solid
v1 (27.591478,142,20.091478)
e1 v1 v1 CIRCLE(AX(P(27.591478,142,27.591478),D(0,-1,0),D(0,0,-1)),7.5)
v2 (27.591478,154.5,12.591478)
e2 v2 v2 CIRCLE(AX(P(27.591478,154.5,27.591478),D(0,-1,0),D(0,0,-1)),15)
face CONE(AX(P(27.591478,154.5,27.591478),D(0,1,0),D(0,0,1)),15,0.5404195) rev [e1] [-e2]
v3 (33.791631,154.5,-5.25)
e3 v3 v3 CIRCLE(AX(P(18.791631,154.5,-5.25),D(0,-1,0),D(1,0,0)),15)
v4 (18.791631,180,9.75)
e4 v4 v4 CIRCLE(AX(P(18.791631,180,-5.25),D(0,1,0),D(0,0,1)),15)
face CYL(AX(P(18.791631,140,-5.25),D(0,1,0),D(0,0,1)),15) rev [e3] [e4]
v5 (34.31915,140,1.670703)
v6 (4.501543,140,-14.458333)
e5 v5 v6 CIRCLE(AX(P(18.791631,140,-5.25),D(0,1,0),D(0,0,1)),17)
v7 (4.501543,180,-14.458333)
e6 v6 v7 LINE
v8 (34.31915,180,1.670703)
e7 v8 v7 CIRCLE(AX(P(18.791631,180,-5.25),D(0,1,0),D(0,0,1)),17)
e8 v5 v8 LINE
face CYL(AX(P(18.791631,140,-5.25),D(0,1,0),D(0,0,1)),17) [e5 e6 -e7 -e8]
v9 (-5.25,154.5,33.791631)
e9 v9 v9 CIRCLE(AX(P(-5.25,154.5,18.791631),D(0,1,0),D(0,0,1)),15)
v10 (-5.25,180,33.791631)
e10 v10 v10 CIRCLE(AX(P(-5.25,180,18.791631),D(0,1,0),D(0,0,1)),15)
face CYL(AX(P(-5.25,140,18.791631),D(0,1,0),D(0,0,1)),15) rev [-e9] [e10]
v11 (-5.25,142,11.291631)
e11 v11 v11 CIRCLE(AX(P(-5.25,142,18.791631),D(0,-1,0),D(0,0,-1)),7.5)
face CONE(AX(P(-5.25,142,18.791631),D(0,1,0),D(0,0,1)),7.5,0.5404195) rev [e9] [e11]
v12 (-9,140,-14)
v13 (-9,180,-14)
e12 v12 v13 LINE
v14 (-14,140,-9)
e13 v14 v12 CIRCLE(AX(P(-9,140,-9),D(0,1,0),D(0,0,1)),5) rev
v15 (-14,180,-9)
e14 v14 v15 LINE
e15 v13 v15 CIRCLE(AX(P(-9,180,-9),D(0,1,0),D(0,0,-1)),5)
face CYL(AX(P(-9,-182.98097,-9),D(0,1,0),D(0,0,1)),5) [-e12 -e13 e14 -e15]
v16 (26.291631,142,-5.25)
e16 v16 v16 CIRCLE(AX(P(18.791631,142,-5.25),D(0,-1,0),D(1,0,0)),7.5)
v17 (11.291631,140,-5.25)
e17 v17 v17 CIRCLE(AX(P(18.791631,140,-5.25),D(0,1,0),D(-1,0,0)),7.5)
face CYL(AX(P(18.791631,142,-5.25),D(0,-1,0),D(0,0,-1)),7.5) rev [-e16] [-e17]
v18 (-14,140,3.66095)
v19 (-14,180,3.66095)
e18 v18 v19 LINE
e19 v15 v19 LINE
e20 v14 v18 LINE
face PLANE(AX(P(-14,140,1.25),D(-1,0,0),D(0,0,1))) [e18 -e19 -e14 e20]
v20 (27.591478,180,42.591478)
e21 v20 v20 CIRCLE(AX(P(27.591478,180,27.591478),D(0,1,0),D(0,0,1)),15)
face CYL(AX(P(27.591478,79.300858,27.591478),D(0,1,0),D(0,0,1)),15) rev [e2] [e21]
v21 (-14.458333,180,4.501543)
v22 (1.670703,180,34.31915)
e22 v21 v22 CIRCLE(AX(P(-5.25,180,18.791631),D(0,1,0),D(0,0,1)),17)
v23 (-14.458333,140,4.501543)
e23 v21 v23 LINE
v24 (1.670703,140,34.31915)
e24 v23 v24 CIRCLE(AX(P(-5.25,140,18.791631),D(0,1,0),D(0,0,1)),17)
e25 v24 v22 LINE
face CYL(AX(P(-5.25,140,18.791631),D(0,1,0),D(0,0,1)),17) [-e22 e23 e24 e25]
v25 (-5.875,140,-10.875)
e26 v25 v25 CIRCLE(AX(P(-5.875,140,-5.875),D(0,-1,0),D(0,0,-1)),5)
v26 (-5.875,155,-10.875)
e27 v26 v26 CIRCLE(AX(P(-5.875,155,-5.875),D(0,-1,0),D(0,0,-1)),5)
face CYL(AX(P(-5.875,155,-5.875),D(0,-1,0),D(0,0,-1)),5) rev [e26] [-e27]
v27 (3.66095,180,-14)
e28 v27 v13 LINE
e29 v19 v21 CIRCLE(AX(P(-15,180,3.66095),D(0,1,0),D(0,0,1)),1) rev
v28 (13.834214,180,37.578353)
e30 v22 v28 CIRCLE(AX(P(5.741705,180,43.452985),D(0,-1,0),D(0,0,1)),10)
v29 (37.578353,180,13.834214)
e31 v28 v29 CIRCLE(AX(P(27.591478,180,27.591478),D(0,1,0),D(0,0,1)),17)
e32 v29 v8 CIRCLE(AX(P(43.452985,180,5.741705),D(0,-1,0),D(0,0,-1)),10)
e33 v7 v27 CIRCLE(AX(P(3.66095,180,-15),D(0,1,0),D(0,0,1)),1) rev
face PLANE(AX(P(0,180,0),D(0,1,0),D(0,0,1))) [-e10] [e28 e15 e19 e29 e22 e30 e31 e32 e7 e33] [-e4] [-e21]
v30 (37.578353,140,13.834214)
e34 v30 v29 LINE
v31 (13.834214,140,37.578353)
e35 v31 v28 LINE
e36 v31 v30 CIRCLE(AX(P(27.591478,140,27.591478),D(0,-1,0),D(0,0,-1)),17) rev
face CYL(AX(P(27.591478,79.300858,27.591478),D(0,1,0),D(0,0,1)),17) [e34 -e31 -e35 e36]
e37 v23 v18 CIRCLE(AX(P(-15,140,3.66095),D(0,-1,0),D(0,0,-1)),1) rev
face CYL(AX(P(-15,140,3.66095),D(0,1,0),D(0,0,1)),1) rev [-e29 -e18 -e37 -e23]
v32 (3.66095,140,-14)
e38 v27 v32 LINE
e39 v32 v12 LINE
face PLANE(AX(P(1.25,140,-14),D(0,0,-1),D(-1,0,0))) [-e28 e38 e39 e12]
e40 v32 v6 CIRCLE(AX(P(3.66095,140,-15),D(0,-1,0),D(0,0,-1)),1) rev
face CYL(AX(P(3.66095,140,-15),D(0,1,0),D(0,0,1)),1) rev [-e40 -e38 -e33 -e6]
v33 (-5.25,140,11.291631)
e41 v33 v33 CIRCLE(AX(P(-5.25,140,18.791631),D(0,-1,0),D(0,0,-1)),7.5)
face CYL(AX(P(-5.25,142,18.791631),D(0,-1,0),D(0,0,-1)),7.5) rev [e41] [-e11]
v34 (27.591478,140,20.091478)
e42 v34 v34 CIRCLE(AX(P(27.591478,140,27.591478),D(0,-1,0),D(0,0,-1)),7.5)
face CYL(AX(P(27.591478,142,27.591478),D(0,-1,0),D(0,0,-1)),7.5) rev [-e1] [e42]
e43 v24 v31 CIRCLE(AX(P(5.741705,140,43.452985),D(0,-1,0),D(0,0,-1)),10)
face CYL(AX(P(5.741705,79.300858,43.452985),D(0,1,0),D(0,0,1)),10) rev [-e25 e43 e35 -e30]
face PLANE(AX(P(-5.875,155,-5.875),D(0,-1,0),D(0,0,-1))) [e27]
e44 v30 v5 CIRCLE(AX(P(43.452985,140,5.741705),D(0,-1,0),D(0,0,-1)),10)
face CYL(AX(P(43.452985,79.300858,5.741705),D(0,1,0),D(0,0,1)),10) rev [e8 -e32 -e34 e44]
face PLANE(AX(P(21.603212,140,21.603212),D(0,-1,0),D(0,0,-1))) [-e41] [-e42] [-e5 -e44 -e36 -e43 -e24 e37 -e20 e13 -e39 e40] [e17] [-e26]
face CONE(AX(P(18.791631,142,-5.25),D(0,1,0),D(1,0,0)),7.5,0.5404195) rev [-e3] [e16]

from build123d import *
from build123d.topology import SkipClean

# Parameters (mm, degrees)
SKETCH1_W                = 30
SKETCH1_H                = 30
BOSS_EXTRUDE1_DEPTH      = 80
SKETCH2_R                = 6
BOSS_EXTRUDE2_DEPTH      = 22
CUT_EXTRUDE1_DEPTH       = 83.764726786
BOSS_EXTRUDE3_DEPTH      = 100
BOSS_EXTRUDE5_DEPTH      = 2
BOSS_EXTRUDE6_DEPTH      = 23
BOSS_EXTRUDE7_DEPTH      = 25
FILLET1_R                = 2
SKETCH11_R               = 6.055782361
CUT_EXTRUDE2_DEPTH       = 2.125
SKETCH12_W               = 13.25
SKETCH12_H               = 8.5
CUT_EXTRUDE4_DEPTH       = 13.25
CUT_EXTRUDE5_REACH       = 204.341
SKETCH15_W               = 3.75
SKETCH15_H               = 3.75
FILLET2_R                = 1
CUT_EXTRUDE7_START       = 22
SKETCH16_R               = 6
CUT_EXTRUDE7_DEPTH       = 22
SKETCH17_R               = 15
BOSS_EXTRUDE8_DEPTH      = 40
FILLET3_R                = 1
SKETCH18_R               = 15
SKETCH18_R_2             = 7.5
BOSS_EXTRUDE9_DEPTH      = 2
SKETCH22_R               = 209.016423622
CUT_EXTRUDE8_DEPTH       = 225.815151847
SKETCH23_W               = 22.070362909
SKETCH23_H               = 16.212180161
CUT_EXTRUDE9_DEPTH       = 65.514197169
SKETCH24_R               = 15
BOSS_EXTRUDE10_DEPTH     = 40
SKETCH25_R               = 15
SKETCH25_R_2             = 7.5
BOSS_EXTRUDE11_DEPTH     = 2
BOSS_EXTRUDE12_DEPTH     = 40
SKETCH29_R               = 2
CUT_EXTRUDE10_DEPTH      = 209.128716183
SKETCH30_R               = 3.025
CUT_EXTRUDE11_DEPTH      = 2.1
CUT_EXTRUDE12_DEPTH      = 111.386253673
CUT_EXTRUDE12_DEPTH_BACK = 111.386253673
SKETCH31_W               = 80
SKETCH31_H               = 80
BOSS_EXTRUDE13_DEPTH     = 190
CUT_EXTRUDE13_DEPTH      = 191.213565988
CUT_EXTRUDE13_DEPTH_BACK = 191.213565988
SKETCH33_W               = 75.892651359
SKETCH33_H               = 150.831877449
SKETCH36_R               = 5
CUT_EXTRUDE14_DEPTH      = 15


with BuildPart() as part:
    # Sketch1 → Boss-Extrude1 (new body)
    with BuildSketch(Plane(origin=(0, 0, 0), x_dir=(1, 0, 0), z_dir=(0, 1, 0))):
        Rectangle(SKETCH1_W, SKETCH1_H)
    extrude(amount=BOSS_EXTRUDE1_DEPTH)

    # Sketch2 → Boss-Extrude2 (add)
    with BuildSketch(Plane(origin=(0, 80, 0), x_dir=(1, 0, 0), z_dir=(0, 1, 0))):
        with Locations(Location((9, -9, 0), (0, 0, 270))):
            Circle(SKETCH2_R)
    extrude(amount=BOSS_EXTRUDE2_DEPTH)

    # Sketch3 → Cut-Extrude1 (cut, through all)
    with BuildSketch(Plane(origin=(0, 80, 0), x_dir=(1, 0, 0), z_dir=(0, 1, 0))):
        with BuildLine():
            Line((9, -15), (15, -15))
            Line((15, -15), (15, -9))
            ThreePointArc((15, -9), (13.242640687, -13.242640687), (9, -15))
        make_face()
    extrude(amount=-CUT_EXTRUDE1_DEPTH, mode=Mode.SUBTRACT)

    # Sketch4 → Boss-Extrude3 (add)
    with BuildSketch(Plane(origin=(0, 80, 0), x_dir=(1, 0, 0), z_dir=(0, 1, 0))):
        Polygon((-8.25, 11.25), (-8.25, 8.25), (-11.25, 8.25), (-15, 8.25), (-15, 11.25), (-11.25, 11.25), (-11.25, 15), (-8.25, 15), align=None)
        Polygon((-1.75, 1.75), (-11.25, 1.75), (-15, 1.75), (-15, -1.25), (-11.25, -1.25), (1.25, -1.25), (1.25, 11.25), (1.25, 15), (-1.75, 15), (-1.75, 11.25), align=None)
    extrude(amount=BOSS_EXTRUDE3_DEPTH)

    # Sketch6 → Boss-Extrude5 (add)
    with BuildSketch(Plane.XZ):
        with BuildLine():
            Line((15, -15), (7, -15))
            Line((7, -15), (7, -99.5))
            ThreePointArc((7, -99.5), (2.757359313, -109.742640687), (13, -105.5))
            Line((13, -105.5), (15, -105.5))
            Line((15, -105.5), (15, -15))
        make_face()
    extrude(amount=-BOSS_EXTRUDE5_DEPTH)

    # Sketch7 → Boss-Extrude6 (add)
    with SkipClean():  # the faces are left unmerged after this step: merging them gives an invalid solid
        with BuildSketch(Plane(origin=(0, 2, 0), x_dir=(1, 0, 0), z_dir=(0, 1, 0))):
            with BuildLine():
                Line((9, 111.156854249), (9, 108.964101615))
                ThreePointArc((9, 108.964101615), (7, 101.5), (5, 108.964101615))
                Line((5, 108.964101615), (5, 111.156854249))
                ThreePointArc((5, 111.156854249), (1.086408642, 104.485388128), (7, 99.5))
                Line((7, 99.5), (7, 15))
                Line((7, 15), (15, 15))
                Line((15, 15), (15, 105.5))
                Line((15, 105.5), (13, 105.5))
                ThreePointArc((13, 105.5), (11.898979486, 108.964101615), (9, 111.156854249))
            make_face()
        extrude(amount=BOSS_EXTRUDE6_DEPTH)

    # Sketch9 → Boss-Extrude7 (add)
    with SkipClean():  # the faces are left unmerged after this step: merging them gives an invalid solid
        with BuildSketch(Plane.XZ):
            with BuildLine():
                Line((-15, 15), (-15, 7))
                Line((-15, 7), (-126.175, 7))
                ThreePointArc((-126.175, 7), (-126.252697751, 6.037536458), (-126.48377869, 5.1))
                Line((-126.48377869, 5.1), (-128.797778509, 5.1))
                ThreePointArc((-128.797778509, 5.1), (-136.05, 7), (-128.797778509, 8.9))
                Line((-128.797778509, 8.9), (-126.3, 8.9))
                ThreePointArc((-126.3, 8.9), (-128.491885554, 11.955834237), (-132.050001601, 13.173329766))
                Line((-132.050001601, 13.173329766), (-132.050001601, 15))
                Line((-132.050001601, 15), (-15, 15))
            make_face()
        extrude(amount=-BOSS_EXTRUDE7_DEPTH)

    # Fillet1
    fillet1_edges = [part.edges().sort_by_distance(p)[0] for p in [
        (-126.175, 12.5, 7),
    ]]
    fillet(fillet1_edges, radius=FILLET1_R)

    # Sketch11 → Cut-Extrude2 (cut)
    with SkipClean():  # the faces are left unmerged after this step: merging them gives an invalid solid
        with BuildSketch(Plane.XZ):
            with Locations((-132.175, 7)):
                Circle(SKETCH11_R)
        extrude(amount=-CUT_EXTRUDE2_DEPTH, mode=Mode.SUBTRACT)

    # Sketch12 → Cut-Extrude4 (cut)
    with SkipClean():  # the faces are left unmerged after this step: merging them gives an invalid solid
        with BuildSketch(Plane.ZY.offset(15)):
            with Locations((-8.375, 72.75)):
                Rectangle(SKETCH12_W, SKETCH12_H)
        extrude(amount=-CUT_EXTRUDE4_DEPTH, mode=Mode.SUBTRACT)

    # Sketch15 → Cut-Extrude5 (cut, up to next)
    with BuildSketch(Plane(origin=(0, 80, 0), x_dir=(1, 0, 0), z_dir=(0, 1, 0)), mode=Mode.PRIVATE) as cut_extrude5_sk1:
        with Locations((-13.125, 13.125)):
            Rectangle(SKETCH15_W, SKETCH15_H)
    cut_extrude5_tool1 = extrude(cut_extrude5_sk1.sketch, amount=-CUT_EXTRUDE5_REACH, mode=Mode.PRIVATE) & part.part
    add(cut_extrude5_tool1.solids().sort_by_distance((-13.125, 80, -13.125))[0], mode=Mode.SUBTRACT)

    # Fillet2
    fillet2_edges = [part.edges().sort_by_distance(p)[0] for p in [
        (-11.25, 130, -15),
        (-11.25, 130, -11.25),
        (-15, 130, -11.25),
        (-15, 130, 1.25),
        (1.25, 130, -15),
    ]]
    fillet(fillet2_edges, radius=FILLET2_R)

    # Sketch16 → Cut-Extrude7 (cut)
    with SkipClean():  # the faces are left unmerged after this step: merging them gives an invalid solid
        with BuildSketch(Plane(origin=(0, 80, 0), x_dir=(1, 0, 0), z_dir=(0, 1, 0)).offset(CUT_EXTRUDE7_START)):
            with Locations((9, -9)):
                Circle(SKETCH16_R)
        extrude(amount=-CUT_EXTRUDE7_DEPTH, mode=Mode.SUBTRACT)


with BuildPart() as cut_extrude7_kept_piece:
    # of the separate pieces the step leaves, the one the design keeps (cut_extrude7_pieces_kept)
    add(part.part.solids().sort_by_distance((-15, 80, 0.25))[0])

    # Sketch17 → Boss-Extrude8 (add)
    with SkipClean():  # the faces are left unmerged after this step: merging them gives an invalid solid
        with BuildSketch(Plane(origin=(0, 180, 0), x_dir=(1, 0, 0), z_dir=(0, 1, 0))):
            with BuildLine():
                Line((-14, -1.25), (-14, -4.216394713))
                ThreePointArc((-14, -4.216394713), (-14.384018227, -33.129332993), (11.657578086, -20.561885701))
                ThreePointArc((11.657578086, -20.561885701), (14.532144442, -14.532144442), (20.561885701, -11.657578086))
                ThreePointArc((20.561885701, -11.657578086), (33.129332993, 14.384018227), (4.216394713, 14))
                Line((4.216394713, 14), (1.25, 14))
                Line((1.25, 14), (1.25, -1.25))
                Line((1.25, -1.25), (-14, -1.25))
            make_face()
            with Locations(Location((18.79163056, 5.25, 0), (0, 0, 270))):
                Circle(SKETCH17_R, mode=Mode.SUBTRACT)
            with Locations(Location((-5.25, -18.79163056, 0), (0, 0, 270))):
                Circle(SKETCH17_R, mode=Mode.SUBTRACT)
        extrude(amount=-BOSS_EXTRUDE8_DEPTH)

    # Fillet3
    # the kernel refuses this fillet: 1 mm, written as the material it adds along each edge
    with BuildSketch(Plane(origin=(-14, 140, 1.25), x_dir=(-0.9659258262890684, 0, -0.25881904510252046), z_dir=(0, 1, 0))) as fillet3_piece_1:
        with BuildLine():
            CenterArc((0.776457135, 0.965925826), FILLET3_R, 195, 60)
            Line((-0.189468691, 0.707106781), (0, 0))
            ThreePointArc((0, 0), (0.258819045, 0.034074174), (0.51763809, 0))
        make_face()
    extrude(amount=40)
    with BuildSketch(Plane(origin=(-14, 180, 4.216394713), x_dir=(0, 0, -1), z_dir=(0, -1, 0))) as fillet3_piece_2:
        with BuildLine():
            CenterArc((0.555444904, -1), FILLET3_R, 90, 57.202831704)
            ThreePointArc((-0.285148471, -0.458333333), (-0.140754957, -0.230298516), (0, 0))
            Line((0, 0), (0.555444904, 0))
        make_face()
    extrude(amount=40)
    with BuildSketch(Plane(origin=(1.25, 140, -14), x_dir=(-0.2588190451025201, 0, -0.9659258262890685), z_dir=(0, 1, 0))) as fillet3_piece_3:
        with BuildLine():
            CenterArc((0.776457135, -0.965925826), FILLET3_R, 105, 60)
            Line((-0.189468691, -0.707106781), (0, 0))
            ThreePointArc((0, 0), (0.258819045, -0.034074174), (0.51763809, 0))
        make_face()
    extrude(amount=40)
    with BuildSketch(Plane(origin=(4.216394713, 180, -14), x_dir=(-1, 0, 0), z_dir=(0, -1, 0))) as fillet3_piece_4:
        with BuildLine():
            CenterArc((0.555444904, 1), FILLET3_R, 212.797168296, 57.202831704)
            ThreePointArc((-0.285148471, 0.458333333), (-0.140754957, 0.230298516), (0, 0))
            Line((0, 0), (0.555444904, 0))
        make_face()
    extrude(amount=40)

    # Sketch18 → Boss-Extrude9 (add)
    with SkipClean():  # the faces are left unmerged after this step: merging them gives an invalid solid
        with BuildSketch(Plane.XZ.offset(-140)):
            with Locations(Location((-5.25, 18.79163056, 0), (0, 0, 90))):
                Circle(SKETCH18_R)
            with Locations(Location((-5.25, 18.79163056, 0), (0, 0, 270))):
                Circle(SKETCH18_R_2, mode=Mode.SUBTRACT)
        boss_extrude9 = extrude(amount=-BOSS_EXTRUDE9_DEPTH)

    # Sketch21 → Revolve1 (revolve)
    with SkipClean():  # the faces are left unmerged after this step: merging them gives an invalid solid
        with BuildSketch(Plane(origin=(-5.25, 0, 0), x_dir=(0, 0, -1), z_dir=(-1, 0, 0)), mode=Mode.PRIVATE) as revolve1_sk:
            Polygon((-11.29163056, -142), (-3.79163056, -154.5), (-3.79163056, -142), align=None)
        revolve1 = revolve(revolve1_sk.sketch.rotate(Axis((-5.25, 1065, 18.79163056), (0, -1, 0)), 180), axis=Axis((-5.25, 1065, 18.79163056), (0, -1, 0)))

    # Mirror1: Boss-Extrude9, Revolve1 across plane
    with SkipClean():  # the faces are left unmerged after this step: merging them gives an invalid solid
        add(boss_extrude9.mirror(Plane(origin=(0, 0, 0), x_dir=(0.7071067811865478, 0, 0.7071067811865472), z_dir=(0.7071067811865475, 0, -0.7071067811865477))))
        add(revolve1.mirror(Plane(origin=(0, 0, 0), x_dir=(0.7071067811865478, 0, 0.7071067811865472), z_dir=(0.7071067811865475, 0, -0.7071067811865477))))

    # Sketch22 → Cut-Extrude8 (cut, through all)
    with BuildSketch(Plane.XZ.offset(-140)):
        Circle(SKETCH22_R)
    extrude(amount=CUT_EXTRUDE8_DEPTH, mode=Mode.SUBTRACT)


with BuildPart() as cut_extrude8_piece_1:
    # of the separate pieces the step leaves, piece 1, a body of its own (cut_extrude8_pieces)
    add(cut_extrude7_kept_piece.part.solids().sort_by_distance((4.501543184, 180, -14.458333333))[0])

    # Sketch24 → Boss-Extrude10 (add)
    with BuildSketch(Plane(origin=(0, 180, 0), x_dir=(1, 0, 0), z_dir=(0, 1, 0))):
        with BuildLine():
            ThreePointArc((13.834213525, -37.57835306), (39.612293374, -39.612293374), (37.57835306, -13.834213525))
            ThreePointArc((37.57835306, -13.834213525), (33.79372713, -8.329895406), (34.31915027, -1.67070312))
            ThreePointArc((34.31915027, -1.67070312), (28.778505526, -8.507264569), (20.561885701, -11.657578086))
            ThreePointArc((20.561885701, -11.657578086), (14.532144442, -14.532144442), (11.657578086, -20.561885701))
            ThreePointArc((11.657578086, -20.561885701), (8.507264569, -28.778505526), (1.67070312, -34.31915027))
            ThreePointArc((1.67070312, -34.31915027), (8.329895406, -33.79372713), (13.834213525, -37.57835306))
        make_face()
        with Locations(Location((27.591478094, -27.591478094, 0), (0, 0, 270))):
            Circle(SKETCH24_R, mode=Mode.SUBTRACT)
    extrude(amount=-BOSS_EXTRUDE10_DEPTH)

    # Sketch25 → Boss-Extrude11 (add)
    with BuildSketch(Plane.XZ.offset(-140)):
        with Locations(Location((27.591478094, 27.591478094, 0), (0, 0, 90))):
            Circle(SKETCH25_R)
        with Locations(Location((27.591478094, 27.591478094, 0), (0, 0, 270))):
            Circle(SKETCH25_R_2, mode=Mode.SUBTRACT)
    extrude(amount=-BOSS_EXTRUDE11_DEPTH)

    # Sketch26 → Revolve2 (revolve)
    with BuildSketch(Plane(origin=(0, 0, 0), x_dir=(-0.7071067811865476, 0, -0.7071067811865475), z_dir=(0.7071067811865475, 0, -0.7071067811865476)), mode=Mode.PRIVATE) as revolve2_sk:
        Polygon((-24.020242526, 142), (-24.020242526, 154.5), (-31.520242526, 142), align=None)
    revolve(revolve2_sk.sketch.rotate(Axis((27.591478094, 126.995387654, 27.591478094), (0, 1, 0)), 135), axis=Axis((27.591478094, 126.995387654, 27.591478094), (0, 1, 0)))

    # Sketch27 → Boss-Extrude12 (add)
    with BuildSketch(Plane(origin=(0, 180, 0), x_dir=(1, 0, 0), z_dir=(0, 1, 0))):
        Polygon((2.25, -2.25), (2.25, 72.75), (-1.75, 72.75), (-1.75, 1.75), (-72.75, 1.75), (-72.75, -2.25), align=None)
    extrude(amount=-BOSS_EXTRUDE12_DEPTH)

    # Sketch29 → Cut-Extrude10 (cut, through all)
    with BuildSketch(Plane.XY.offset(2.25)):
        with Locations((-24, 144)):
            Circle(SKETCH29_R)
        with Locations((-24, 176)):
            Circle(SKETCH29_R)
        with Locations((-68.75, 144)):
            Circle(SKETCH29_R)
        with Locations((-68.75, 176)):
            Circle(SKETCH29_R)
    cut_extrude10 = extrude(amount=-CUT_EXTRUDE10_DEPTH, mode=Mode.SUBTRACT)

    # Sketch30 → Cut-Extrude11 (cut)
    with BuildSketch(Plane(origin=(0, 0, -1.75), x_dir=(-1, 0, 0), z_dir=(0, 0, -1))):
        with Locations((14.135, 148)):
            Circle(SKETCH30_R)
        with Locations((29.545, 148)):
            Circle(SKETCH30_R)
        with Locations((44.955, 148)):
            Circle(SKETCH30_R)
        with Locations((60.365, 148)):
            Circle(SKETCH30_R)
        with Locations(Location((60.365, 172, 0), (0, 0, 180))):
            Circle(SKETCH30_R)
        with Locations(Location((44.955, 172, 0), (0, 0, 180))):
            Circle(SKETCH30_R)
        with Locations(Location((29.545, 172, 0), (0, 0, 180))):
            Circle(SKETCH30_R)
        with Locations(Location((14.135, 172, 0), (0, 0, 180))):
            Circle(SKETCH30_R)
    cut_extrude11 = extrude(amount=-CUT_EXTRUDE11_DEPTH, mode=Mode.SUBTRACT)

    # Mirror2: Cut-Extrude10, Cut-Extrude11 across plane
    add(cut_extrude10.mirror(Plane(origin=(0, 0, 0), x_dir=(0.7071067811865476, 0, 0.7071067811865475), z_dir=(0.7071067811865475, 0, -0.7071067811865476))), mode=Mode.SUBTRACT)
    add(cut_extrude11.mirror(Plane(origin=(0, 0, 0), x_dir=(0.7071067811865476, 0, 0.7071067811865475), z_dir=(0.7071067811865475, 0, -0.7071067811865476))), mode=Mode.SUBTRACT)

    # Sketch31 → Cut-Extrude12 (cut, two sides: drawn at the far end of the back side and taken through both)
    with BuildSketch(Plane(origin=(0, 180, 0), x_dir=(1, 0, 0), z_dir=(0, 1, 0)).offset(-CUT_EXTRUDE12_DEPTH_BACK)):
        with Locations((-37.75, 37.75)):
            Rectangle(SKETCH31_W, SKETCH31_H)
    extrude(amount=CUT_EXTRUDE12_DEPTH + CUT_EXTRUDE12_DEPTH_BACK, mode=Mode.SUBTRACT)

    # Sketch32 → Boss-Extrude13 (add)
    with BuildSketch(Plane(origin=(0, 180, 0), x_dir=(1, 0, 0), z_dir=(0, 1, 0))):
        with BuildLine():
            Line((-14, -2.25), (2.25, -2.25))
            Line((2.25, -2.25), (2.25, 14))
            Line((2.25, 14), (-9, 14))
            ThreePointArc((-9, 14), (-12.535533906, 12.535533906), (-14, 9))
            Line((-14, 9), (-14, -2.25))
        make_face()
    extrude(amount=-BOSS_EXTRUDE13_DEPTH)

    # Sketch33 → Cut-Extrude13 (cut, two sides: drawn at the far end of the back side and taken through both)
    with BuildSketch(Plane.XY.offset(2.25).offset(-CUT_EXTRUDE13_DEPTH_BACK)):
        with Locations((-20.864349969, 64.584061276)):
            Rectangle(SKETCH33_W, SKETCH33_H)
    extrude(amount=CUT_EXTRUDE13_DEPTH + CUT_EXTRUDE13_DEPTH_BACK, mode=Mode.SUBTRACT)

    # Sketch36 → Cut-Extrude14 (cut)
    with BuildSketch(Plane.XZ.offset(-140)):
        with Locations(Location((-5.875, -5.875, 0), (0, 0, 270))):
            Circle(SKETCH36_R)
    extrude(amount=-CUT_EXTRUDE14_DEPTH, mode=Mode.SUBTRACT)


with BuildPart() as cut_extrude8_piece_2:
    # of the separate pieces the step leaves, piece 2, a body of its own (cut_extrude8_pieces)
    add(cut_extrude7_kept_piece.part.solids().sort_by_distance((-10.25, 140, -15))[0])

    # Sketch23 → Cut-Extrude9 (cut, through all)
    with BuildSketch(Plane(origin=(0, 180, 0), x_dir=(1, 0, 0), z_dir=(0, 1, 0))):
        with Locations((-15.719387653, 13.178118111)):
            Rectangle(SKETCH23_W, SKETCH23_H)
    extrude(amount=-CUT_EXTRUDE9_DEPTH, mode=Mode.SUBTRACT)


solid = cut_extrude8_piece_1.part
